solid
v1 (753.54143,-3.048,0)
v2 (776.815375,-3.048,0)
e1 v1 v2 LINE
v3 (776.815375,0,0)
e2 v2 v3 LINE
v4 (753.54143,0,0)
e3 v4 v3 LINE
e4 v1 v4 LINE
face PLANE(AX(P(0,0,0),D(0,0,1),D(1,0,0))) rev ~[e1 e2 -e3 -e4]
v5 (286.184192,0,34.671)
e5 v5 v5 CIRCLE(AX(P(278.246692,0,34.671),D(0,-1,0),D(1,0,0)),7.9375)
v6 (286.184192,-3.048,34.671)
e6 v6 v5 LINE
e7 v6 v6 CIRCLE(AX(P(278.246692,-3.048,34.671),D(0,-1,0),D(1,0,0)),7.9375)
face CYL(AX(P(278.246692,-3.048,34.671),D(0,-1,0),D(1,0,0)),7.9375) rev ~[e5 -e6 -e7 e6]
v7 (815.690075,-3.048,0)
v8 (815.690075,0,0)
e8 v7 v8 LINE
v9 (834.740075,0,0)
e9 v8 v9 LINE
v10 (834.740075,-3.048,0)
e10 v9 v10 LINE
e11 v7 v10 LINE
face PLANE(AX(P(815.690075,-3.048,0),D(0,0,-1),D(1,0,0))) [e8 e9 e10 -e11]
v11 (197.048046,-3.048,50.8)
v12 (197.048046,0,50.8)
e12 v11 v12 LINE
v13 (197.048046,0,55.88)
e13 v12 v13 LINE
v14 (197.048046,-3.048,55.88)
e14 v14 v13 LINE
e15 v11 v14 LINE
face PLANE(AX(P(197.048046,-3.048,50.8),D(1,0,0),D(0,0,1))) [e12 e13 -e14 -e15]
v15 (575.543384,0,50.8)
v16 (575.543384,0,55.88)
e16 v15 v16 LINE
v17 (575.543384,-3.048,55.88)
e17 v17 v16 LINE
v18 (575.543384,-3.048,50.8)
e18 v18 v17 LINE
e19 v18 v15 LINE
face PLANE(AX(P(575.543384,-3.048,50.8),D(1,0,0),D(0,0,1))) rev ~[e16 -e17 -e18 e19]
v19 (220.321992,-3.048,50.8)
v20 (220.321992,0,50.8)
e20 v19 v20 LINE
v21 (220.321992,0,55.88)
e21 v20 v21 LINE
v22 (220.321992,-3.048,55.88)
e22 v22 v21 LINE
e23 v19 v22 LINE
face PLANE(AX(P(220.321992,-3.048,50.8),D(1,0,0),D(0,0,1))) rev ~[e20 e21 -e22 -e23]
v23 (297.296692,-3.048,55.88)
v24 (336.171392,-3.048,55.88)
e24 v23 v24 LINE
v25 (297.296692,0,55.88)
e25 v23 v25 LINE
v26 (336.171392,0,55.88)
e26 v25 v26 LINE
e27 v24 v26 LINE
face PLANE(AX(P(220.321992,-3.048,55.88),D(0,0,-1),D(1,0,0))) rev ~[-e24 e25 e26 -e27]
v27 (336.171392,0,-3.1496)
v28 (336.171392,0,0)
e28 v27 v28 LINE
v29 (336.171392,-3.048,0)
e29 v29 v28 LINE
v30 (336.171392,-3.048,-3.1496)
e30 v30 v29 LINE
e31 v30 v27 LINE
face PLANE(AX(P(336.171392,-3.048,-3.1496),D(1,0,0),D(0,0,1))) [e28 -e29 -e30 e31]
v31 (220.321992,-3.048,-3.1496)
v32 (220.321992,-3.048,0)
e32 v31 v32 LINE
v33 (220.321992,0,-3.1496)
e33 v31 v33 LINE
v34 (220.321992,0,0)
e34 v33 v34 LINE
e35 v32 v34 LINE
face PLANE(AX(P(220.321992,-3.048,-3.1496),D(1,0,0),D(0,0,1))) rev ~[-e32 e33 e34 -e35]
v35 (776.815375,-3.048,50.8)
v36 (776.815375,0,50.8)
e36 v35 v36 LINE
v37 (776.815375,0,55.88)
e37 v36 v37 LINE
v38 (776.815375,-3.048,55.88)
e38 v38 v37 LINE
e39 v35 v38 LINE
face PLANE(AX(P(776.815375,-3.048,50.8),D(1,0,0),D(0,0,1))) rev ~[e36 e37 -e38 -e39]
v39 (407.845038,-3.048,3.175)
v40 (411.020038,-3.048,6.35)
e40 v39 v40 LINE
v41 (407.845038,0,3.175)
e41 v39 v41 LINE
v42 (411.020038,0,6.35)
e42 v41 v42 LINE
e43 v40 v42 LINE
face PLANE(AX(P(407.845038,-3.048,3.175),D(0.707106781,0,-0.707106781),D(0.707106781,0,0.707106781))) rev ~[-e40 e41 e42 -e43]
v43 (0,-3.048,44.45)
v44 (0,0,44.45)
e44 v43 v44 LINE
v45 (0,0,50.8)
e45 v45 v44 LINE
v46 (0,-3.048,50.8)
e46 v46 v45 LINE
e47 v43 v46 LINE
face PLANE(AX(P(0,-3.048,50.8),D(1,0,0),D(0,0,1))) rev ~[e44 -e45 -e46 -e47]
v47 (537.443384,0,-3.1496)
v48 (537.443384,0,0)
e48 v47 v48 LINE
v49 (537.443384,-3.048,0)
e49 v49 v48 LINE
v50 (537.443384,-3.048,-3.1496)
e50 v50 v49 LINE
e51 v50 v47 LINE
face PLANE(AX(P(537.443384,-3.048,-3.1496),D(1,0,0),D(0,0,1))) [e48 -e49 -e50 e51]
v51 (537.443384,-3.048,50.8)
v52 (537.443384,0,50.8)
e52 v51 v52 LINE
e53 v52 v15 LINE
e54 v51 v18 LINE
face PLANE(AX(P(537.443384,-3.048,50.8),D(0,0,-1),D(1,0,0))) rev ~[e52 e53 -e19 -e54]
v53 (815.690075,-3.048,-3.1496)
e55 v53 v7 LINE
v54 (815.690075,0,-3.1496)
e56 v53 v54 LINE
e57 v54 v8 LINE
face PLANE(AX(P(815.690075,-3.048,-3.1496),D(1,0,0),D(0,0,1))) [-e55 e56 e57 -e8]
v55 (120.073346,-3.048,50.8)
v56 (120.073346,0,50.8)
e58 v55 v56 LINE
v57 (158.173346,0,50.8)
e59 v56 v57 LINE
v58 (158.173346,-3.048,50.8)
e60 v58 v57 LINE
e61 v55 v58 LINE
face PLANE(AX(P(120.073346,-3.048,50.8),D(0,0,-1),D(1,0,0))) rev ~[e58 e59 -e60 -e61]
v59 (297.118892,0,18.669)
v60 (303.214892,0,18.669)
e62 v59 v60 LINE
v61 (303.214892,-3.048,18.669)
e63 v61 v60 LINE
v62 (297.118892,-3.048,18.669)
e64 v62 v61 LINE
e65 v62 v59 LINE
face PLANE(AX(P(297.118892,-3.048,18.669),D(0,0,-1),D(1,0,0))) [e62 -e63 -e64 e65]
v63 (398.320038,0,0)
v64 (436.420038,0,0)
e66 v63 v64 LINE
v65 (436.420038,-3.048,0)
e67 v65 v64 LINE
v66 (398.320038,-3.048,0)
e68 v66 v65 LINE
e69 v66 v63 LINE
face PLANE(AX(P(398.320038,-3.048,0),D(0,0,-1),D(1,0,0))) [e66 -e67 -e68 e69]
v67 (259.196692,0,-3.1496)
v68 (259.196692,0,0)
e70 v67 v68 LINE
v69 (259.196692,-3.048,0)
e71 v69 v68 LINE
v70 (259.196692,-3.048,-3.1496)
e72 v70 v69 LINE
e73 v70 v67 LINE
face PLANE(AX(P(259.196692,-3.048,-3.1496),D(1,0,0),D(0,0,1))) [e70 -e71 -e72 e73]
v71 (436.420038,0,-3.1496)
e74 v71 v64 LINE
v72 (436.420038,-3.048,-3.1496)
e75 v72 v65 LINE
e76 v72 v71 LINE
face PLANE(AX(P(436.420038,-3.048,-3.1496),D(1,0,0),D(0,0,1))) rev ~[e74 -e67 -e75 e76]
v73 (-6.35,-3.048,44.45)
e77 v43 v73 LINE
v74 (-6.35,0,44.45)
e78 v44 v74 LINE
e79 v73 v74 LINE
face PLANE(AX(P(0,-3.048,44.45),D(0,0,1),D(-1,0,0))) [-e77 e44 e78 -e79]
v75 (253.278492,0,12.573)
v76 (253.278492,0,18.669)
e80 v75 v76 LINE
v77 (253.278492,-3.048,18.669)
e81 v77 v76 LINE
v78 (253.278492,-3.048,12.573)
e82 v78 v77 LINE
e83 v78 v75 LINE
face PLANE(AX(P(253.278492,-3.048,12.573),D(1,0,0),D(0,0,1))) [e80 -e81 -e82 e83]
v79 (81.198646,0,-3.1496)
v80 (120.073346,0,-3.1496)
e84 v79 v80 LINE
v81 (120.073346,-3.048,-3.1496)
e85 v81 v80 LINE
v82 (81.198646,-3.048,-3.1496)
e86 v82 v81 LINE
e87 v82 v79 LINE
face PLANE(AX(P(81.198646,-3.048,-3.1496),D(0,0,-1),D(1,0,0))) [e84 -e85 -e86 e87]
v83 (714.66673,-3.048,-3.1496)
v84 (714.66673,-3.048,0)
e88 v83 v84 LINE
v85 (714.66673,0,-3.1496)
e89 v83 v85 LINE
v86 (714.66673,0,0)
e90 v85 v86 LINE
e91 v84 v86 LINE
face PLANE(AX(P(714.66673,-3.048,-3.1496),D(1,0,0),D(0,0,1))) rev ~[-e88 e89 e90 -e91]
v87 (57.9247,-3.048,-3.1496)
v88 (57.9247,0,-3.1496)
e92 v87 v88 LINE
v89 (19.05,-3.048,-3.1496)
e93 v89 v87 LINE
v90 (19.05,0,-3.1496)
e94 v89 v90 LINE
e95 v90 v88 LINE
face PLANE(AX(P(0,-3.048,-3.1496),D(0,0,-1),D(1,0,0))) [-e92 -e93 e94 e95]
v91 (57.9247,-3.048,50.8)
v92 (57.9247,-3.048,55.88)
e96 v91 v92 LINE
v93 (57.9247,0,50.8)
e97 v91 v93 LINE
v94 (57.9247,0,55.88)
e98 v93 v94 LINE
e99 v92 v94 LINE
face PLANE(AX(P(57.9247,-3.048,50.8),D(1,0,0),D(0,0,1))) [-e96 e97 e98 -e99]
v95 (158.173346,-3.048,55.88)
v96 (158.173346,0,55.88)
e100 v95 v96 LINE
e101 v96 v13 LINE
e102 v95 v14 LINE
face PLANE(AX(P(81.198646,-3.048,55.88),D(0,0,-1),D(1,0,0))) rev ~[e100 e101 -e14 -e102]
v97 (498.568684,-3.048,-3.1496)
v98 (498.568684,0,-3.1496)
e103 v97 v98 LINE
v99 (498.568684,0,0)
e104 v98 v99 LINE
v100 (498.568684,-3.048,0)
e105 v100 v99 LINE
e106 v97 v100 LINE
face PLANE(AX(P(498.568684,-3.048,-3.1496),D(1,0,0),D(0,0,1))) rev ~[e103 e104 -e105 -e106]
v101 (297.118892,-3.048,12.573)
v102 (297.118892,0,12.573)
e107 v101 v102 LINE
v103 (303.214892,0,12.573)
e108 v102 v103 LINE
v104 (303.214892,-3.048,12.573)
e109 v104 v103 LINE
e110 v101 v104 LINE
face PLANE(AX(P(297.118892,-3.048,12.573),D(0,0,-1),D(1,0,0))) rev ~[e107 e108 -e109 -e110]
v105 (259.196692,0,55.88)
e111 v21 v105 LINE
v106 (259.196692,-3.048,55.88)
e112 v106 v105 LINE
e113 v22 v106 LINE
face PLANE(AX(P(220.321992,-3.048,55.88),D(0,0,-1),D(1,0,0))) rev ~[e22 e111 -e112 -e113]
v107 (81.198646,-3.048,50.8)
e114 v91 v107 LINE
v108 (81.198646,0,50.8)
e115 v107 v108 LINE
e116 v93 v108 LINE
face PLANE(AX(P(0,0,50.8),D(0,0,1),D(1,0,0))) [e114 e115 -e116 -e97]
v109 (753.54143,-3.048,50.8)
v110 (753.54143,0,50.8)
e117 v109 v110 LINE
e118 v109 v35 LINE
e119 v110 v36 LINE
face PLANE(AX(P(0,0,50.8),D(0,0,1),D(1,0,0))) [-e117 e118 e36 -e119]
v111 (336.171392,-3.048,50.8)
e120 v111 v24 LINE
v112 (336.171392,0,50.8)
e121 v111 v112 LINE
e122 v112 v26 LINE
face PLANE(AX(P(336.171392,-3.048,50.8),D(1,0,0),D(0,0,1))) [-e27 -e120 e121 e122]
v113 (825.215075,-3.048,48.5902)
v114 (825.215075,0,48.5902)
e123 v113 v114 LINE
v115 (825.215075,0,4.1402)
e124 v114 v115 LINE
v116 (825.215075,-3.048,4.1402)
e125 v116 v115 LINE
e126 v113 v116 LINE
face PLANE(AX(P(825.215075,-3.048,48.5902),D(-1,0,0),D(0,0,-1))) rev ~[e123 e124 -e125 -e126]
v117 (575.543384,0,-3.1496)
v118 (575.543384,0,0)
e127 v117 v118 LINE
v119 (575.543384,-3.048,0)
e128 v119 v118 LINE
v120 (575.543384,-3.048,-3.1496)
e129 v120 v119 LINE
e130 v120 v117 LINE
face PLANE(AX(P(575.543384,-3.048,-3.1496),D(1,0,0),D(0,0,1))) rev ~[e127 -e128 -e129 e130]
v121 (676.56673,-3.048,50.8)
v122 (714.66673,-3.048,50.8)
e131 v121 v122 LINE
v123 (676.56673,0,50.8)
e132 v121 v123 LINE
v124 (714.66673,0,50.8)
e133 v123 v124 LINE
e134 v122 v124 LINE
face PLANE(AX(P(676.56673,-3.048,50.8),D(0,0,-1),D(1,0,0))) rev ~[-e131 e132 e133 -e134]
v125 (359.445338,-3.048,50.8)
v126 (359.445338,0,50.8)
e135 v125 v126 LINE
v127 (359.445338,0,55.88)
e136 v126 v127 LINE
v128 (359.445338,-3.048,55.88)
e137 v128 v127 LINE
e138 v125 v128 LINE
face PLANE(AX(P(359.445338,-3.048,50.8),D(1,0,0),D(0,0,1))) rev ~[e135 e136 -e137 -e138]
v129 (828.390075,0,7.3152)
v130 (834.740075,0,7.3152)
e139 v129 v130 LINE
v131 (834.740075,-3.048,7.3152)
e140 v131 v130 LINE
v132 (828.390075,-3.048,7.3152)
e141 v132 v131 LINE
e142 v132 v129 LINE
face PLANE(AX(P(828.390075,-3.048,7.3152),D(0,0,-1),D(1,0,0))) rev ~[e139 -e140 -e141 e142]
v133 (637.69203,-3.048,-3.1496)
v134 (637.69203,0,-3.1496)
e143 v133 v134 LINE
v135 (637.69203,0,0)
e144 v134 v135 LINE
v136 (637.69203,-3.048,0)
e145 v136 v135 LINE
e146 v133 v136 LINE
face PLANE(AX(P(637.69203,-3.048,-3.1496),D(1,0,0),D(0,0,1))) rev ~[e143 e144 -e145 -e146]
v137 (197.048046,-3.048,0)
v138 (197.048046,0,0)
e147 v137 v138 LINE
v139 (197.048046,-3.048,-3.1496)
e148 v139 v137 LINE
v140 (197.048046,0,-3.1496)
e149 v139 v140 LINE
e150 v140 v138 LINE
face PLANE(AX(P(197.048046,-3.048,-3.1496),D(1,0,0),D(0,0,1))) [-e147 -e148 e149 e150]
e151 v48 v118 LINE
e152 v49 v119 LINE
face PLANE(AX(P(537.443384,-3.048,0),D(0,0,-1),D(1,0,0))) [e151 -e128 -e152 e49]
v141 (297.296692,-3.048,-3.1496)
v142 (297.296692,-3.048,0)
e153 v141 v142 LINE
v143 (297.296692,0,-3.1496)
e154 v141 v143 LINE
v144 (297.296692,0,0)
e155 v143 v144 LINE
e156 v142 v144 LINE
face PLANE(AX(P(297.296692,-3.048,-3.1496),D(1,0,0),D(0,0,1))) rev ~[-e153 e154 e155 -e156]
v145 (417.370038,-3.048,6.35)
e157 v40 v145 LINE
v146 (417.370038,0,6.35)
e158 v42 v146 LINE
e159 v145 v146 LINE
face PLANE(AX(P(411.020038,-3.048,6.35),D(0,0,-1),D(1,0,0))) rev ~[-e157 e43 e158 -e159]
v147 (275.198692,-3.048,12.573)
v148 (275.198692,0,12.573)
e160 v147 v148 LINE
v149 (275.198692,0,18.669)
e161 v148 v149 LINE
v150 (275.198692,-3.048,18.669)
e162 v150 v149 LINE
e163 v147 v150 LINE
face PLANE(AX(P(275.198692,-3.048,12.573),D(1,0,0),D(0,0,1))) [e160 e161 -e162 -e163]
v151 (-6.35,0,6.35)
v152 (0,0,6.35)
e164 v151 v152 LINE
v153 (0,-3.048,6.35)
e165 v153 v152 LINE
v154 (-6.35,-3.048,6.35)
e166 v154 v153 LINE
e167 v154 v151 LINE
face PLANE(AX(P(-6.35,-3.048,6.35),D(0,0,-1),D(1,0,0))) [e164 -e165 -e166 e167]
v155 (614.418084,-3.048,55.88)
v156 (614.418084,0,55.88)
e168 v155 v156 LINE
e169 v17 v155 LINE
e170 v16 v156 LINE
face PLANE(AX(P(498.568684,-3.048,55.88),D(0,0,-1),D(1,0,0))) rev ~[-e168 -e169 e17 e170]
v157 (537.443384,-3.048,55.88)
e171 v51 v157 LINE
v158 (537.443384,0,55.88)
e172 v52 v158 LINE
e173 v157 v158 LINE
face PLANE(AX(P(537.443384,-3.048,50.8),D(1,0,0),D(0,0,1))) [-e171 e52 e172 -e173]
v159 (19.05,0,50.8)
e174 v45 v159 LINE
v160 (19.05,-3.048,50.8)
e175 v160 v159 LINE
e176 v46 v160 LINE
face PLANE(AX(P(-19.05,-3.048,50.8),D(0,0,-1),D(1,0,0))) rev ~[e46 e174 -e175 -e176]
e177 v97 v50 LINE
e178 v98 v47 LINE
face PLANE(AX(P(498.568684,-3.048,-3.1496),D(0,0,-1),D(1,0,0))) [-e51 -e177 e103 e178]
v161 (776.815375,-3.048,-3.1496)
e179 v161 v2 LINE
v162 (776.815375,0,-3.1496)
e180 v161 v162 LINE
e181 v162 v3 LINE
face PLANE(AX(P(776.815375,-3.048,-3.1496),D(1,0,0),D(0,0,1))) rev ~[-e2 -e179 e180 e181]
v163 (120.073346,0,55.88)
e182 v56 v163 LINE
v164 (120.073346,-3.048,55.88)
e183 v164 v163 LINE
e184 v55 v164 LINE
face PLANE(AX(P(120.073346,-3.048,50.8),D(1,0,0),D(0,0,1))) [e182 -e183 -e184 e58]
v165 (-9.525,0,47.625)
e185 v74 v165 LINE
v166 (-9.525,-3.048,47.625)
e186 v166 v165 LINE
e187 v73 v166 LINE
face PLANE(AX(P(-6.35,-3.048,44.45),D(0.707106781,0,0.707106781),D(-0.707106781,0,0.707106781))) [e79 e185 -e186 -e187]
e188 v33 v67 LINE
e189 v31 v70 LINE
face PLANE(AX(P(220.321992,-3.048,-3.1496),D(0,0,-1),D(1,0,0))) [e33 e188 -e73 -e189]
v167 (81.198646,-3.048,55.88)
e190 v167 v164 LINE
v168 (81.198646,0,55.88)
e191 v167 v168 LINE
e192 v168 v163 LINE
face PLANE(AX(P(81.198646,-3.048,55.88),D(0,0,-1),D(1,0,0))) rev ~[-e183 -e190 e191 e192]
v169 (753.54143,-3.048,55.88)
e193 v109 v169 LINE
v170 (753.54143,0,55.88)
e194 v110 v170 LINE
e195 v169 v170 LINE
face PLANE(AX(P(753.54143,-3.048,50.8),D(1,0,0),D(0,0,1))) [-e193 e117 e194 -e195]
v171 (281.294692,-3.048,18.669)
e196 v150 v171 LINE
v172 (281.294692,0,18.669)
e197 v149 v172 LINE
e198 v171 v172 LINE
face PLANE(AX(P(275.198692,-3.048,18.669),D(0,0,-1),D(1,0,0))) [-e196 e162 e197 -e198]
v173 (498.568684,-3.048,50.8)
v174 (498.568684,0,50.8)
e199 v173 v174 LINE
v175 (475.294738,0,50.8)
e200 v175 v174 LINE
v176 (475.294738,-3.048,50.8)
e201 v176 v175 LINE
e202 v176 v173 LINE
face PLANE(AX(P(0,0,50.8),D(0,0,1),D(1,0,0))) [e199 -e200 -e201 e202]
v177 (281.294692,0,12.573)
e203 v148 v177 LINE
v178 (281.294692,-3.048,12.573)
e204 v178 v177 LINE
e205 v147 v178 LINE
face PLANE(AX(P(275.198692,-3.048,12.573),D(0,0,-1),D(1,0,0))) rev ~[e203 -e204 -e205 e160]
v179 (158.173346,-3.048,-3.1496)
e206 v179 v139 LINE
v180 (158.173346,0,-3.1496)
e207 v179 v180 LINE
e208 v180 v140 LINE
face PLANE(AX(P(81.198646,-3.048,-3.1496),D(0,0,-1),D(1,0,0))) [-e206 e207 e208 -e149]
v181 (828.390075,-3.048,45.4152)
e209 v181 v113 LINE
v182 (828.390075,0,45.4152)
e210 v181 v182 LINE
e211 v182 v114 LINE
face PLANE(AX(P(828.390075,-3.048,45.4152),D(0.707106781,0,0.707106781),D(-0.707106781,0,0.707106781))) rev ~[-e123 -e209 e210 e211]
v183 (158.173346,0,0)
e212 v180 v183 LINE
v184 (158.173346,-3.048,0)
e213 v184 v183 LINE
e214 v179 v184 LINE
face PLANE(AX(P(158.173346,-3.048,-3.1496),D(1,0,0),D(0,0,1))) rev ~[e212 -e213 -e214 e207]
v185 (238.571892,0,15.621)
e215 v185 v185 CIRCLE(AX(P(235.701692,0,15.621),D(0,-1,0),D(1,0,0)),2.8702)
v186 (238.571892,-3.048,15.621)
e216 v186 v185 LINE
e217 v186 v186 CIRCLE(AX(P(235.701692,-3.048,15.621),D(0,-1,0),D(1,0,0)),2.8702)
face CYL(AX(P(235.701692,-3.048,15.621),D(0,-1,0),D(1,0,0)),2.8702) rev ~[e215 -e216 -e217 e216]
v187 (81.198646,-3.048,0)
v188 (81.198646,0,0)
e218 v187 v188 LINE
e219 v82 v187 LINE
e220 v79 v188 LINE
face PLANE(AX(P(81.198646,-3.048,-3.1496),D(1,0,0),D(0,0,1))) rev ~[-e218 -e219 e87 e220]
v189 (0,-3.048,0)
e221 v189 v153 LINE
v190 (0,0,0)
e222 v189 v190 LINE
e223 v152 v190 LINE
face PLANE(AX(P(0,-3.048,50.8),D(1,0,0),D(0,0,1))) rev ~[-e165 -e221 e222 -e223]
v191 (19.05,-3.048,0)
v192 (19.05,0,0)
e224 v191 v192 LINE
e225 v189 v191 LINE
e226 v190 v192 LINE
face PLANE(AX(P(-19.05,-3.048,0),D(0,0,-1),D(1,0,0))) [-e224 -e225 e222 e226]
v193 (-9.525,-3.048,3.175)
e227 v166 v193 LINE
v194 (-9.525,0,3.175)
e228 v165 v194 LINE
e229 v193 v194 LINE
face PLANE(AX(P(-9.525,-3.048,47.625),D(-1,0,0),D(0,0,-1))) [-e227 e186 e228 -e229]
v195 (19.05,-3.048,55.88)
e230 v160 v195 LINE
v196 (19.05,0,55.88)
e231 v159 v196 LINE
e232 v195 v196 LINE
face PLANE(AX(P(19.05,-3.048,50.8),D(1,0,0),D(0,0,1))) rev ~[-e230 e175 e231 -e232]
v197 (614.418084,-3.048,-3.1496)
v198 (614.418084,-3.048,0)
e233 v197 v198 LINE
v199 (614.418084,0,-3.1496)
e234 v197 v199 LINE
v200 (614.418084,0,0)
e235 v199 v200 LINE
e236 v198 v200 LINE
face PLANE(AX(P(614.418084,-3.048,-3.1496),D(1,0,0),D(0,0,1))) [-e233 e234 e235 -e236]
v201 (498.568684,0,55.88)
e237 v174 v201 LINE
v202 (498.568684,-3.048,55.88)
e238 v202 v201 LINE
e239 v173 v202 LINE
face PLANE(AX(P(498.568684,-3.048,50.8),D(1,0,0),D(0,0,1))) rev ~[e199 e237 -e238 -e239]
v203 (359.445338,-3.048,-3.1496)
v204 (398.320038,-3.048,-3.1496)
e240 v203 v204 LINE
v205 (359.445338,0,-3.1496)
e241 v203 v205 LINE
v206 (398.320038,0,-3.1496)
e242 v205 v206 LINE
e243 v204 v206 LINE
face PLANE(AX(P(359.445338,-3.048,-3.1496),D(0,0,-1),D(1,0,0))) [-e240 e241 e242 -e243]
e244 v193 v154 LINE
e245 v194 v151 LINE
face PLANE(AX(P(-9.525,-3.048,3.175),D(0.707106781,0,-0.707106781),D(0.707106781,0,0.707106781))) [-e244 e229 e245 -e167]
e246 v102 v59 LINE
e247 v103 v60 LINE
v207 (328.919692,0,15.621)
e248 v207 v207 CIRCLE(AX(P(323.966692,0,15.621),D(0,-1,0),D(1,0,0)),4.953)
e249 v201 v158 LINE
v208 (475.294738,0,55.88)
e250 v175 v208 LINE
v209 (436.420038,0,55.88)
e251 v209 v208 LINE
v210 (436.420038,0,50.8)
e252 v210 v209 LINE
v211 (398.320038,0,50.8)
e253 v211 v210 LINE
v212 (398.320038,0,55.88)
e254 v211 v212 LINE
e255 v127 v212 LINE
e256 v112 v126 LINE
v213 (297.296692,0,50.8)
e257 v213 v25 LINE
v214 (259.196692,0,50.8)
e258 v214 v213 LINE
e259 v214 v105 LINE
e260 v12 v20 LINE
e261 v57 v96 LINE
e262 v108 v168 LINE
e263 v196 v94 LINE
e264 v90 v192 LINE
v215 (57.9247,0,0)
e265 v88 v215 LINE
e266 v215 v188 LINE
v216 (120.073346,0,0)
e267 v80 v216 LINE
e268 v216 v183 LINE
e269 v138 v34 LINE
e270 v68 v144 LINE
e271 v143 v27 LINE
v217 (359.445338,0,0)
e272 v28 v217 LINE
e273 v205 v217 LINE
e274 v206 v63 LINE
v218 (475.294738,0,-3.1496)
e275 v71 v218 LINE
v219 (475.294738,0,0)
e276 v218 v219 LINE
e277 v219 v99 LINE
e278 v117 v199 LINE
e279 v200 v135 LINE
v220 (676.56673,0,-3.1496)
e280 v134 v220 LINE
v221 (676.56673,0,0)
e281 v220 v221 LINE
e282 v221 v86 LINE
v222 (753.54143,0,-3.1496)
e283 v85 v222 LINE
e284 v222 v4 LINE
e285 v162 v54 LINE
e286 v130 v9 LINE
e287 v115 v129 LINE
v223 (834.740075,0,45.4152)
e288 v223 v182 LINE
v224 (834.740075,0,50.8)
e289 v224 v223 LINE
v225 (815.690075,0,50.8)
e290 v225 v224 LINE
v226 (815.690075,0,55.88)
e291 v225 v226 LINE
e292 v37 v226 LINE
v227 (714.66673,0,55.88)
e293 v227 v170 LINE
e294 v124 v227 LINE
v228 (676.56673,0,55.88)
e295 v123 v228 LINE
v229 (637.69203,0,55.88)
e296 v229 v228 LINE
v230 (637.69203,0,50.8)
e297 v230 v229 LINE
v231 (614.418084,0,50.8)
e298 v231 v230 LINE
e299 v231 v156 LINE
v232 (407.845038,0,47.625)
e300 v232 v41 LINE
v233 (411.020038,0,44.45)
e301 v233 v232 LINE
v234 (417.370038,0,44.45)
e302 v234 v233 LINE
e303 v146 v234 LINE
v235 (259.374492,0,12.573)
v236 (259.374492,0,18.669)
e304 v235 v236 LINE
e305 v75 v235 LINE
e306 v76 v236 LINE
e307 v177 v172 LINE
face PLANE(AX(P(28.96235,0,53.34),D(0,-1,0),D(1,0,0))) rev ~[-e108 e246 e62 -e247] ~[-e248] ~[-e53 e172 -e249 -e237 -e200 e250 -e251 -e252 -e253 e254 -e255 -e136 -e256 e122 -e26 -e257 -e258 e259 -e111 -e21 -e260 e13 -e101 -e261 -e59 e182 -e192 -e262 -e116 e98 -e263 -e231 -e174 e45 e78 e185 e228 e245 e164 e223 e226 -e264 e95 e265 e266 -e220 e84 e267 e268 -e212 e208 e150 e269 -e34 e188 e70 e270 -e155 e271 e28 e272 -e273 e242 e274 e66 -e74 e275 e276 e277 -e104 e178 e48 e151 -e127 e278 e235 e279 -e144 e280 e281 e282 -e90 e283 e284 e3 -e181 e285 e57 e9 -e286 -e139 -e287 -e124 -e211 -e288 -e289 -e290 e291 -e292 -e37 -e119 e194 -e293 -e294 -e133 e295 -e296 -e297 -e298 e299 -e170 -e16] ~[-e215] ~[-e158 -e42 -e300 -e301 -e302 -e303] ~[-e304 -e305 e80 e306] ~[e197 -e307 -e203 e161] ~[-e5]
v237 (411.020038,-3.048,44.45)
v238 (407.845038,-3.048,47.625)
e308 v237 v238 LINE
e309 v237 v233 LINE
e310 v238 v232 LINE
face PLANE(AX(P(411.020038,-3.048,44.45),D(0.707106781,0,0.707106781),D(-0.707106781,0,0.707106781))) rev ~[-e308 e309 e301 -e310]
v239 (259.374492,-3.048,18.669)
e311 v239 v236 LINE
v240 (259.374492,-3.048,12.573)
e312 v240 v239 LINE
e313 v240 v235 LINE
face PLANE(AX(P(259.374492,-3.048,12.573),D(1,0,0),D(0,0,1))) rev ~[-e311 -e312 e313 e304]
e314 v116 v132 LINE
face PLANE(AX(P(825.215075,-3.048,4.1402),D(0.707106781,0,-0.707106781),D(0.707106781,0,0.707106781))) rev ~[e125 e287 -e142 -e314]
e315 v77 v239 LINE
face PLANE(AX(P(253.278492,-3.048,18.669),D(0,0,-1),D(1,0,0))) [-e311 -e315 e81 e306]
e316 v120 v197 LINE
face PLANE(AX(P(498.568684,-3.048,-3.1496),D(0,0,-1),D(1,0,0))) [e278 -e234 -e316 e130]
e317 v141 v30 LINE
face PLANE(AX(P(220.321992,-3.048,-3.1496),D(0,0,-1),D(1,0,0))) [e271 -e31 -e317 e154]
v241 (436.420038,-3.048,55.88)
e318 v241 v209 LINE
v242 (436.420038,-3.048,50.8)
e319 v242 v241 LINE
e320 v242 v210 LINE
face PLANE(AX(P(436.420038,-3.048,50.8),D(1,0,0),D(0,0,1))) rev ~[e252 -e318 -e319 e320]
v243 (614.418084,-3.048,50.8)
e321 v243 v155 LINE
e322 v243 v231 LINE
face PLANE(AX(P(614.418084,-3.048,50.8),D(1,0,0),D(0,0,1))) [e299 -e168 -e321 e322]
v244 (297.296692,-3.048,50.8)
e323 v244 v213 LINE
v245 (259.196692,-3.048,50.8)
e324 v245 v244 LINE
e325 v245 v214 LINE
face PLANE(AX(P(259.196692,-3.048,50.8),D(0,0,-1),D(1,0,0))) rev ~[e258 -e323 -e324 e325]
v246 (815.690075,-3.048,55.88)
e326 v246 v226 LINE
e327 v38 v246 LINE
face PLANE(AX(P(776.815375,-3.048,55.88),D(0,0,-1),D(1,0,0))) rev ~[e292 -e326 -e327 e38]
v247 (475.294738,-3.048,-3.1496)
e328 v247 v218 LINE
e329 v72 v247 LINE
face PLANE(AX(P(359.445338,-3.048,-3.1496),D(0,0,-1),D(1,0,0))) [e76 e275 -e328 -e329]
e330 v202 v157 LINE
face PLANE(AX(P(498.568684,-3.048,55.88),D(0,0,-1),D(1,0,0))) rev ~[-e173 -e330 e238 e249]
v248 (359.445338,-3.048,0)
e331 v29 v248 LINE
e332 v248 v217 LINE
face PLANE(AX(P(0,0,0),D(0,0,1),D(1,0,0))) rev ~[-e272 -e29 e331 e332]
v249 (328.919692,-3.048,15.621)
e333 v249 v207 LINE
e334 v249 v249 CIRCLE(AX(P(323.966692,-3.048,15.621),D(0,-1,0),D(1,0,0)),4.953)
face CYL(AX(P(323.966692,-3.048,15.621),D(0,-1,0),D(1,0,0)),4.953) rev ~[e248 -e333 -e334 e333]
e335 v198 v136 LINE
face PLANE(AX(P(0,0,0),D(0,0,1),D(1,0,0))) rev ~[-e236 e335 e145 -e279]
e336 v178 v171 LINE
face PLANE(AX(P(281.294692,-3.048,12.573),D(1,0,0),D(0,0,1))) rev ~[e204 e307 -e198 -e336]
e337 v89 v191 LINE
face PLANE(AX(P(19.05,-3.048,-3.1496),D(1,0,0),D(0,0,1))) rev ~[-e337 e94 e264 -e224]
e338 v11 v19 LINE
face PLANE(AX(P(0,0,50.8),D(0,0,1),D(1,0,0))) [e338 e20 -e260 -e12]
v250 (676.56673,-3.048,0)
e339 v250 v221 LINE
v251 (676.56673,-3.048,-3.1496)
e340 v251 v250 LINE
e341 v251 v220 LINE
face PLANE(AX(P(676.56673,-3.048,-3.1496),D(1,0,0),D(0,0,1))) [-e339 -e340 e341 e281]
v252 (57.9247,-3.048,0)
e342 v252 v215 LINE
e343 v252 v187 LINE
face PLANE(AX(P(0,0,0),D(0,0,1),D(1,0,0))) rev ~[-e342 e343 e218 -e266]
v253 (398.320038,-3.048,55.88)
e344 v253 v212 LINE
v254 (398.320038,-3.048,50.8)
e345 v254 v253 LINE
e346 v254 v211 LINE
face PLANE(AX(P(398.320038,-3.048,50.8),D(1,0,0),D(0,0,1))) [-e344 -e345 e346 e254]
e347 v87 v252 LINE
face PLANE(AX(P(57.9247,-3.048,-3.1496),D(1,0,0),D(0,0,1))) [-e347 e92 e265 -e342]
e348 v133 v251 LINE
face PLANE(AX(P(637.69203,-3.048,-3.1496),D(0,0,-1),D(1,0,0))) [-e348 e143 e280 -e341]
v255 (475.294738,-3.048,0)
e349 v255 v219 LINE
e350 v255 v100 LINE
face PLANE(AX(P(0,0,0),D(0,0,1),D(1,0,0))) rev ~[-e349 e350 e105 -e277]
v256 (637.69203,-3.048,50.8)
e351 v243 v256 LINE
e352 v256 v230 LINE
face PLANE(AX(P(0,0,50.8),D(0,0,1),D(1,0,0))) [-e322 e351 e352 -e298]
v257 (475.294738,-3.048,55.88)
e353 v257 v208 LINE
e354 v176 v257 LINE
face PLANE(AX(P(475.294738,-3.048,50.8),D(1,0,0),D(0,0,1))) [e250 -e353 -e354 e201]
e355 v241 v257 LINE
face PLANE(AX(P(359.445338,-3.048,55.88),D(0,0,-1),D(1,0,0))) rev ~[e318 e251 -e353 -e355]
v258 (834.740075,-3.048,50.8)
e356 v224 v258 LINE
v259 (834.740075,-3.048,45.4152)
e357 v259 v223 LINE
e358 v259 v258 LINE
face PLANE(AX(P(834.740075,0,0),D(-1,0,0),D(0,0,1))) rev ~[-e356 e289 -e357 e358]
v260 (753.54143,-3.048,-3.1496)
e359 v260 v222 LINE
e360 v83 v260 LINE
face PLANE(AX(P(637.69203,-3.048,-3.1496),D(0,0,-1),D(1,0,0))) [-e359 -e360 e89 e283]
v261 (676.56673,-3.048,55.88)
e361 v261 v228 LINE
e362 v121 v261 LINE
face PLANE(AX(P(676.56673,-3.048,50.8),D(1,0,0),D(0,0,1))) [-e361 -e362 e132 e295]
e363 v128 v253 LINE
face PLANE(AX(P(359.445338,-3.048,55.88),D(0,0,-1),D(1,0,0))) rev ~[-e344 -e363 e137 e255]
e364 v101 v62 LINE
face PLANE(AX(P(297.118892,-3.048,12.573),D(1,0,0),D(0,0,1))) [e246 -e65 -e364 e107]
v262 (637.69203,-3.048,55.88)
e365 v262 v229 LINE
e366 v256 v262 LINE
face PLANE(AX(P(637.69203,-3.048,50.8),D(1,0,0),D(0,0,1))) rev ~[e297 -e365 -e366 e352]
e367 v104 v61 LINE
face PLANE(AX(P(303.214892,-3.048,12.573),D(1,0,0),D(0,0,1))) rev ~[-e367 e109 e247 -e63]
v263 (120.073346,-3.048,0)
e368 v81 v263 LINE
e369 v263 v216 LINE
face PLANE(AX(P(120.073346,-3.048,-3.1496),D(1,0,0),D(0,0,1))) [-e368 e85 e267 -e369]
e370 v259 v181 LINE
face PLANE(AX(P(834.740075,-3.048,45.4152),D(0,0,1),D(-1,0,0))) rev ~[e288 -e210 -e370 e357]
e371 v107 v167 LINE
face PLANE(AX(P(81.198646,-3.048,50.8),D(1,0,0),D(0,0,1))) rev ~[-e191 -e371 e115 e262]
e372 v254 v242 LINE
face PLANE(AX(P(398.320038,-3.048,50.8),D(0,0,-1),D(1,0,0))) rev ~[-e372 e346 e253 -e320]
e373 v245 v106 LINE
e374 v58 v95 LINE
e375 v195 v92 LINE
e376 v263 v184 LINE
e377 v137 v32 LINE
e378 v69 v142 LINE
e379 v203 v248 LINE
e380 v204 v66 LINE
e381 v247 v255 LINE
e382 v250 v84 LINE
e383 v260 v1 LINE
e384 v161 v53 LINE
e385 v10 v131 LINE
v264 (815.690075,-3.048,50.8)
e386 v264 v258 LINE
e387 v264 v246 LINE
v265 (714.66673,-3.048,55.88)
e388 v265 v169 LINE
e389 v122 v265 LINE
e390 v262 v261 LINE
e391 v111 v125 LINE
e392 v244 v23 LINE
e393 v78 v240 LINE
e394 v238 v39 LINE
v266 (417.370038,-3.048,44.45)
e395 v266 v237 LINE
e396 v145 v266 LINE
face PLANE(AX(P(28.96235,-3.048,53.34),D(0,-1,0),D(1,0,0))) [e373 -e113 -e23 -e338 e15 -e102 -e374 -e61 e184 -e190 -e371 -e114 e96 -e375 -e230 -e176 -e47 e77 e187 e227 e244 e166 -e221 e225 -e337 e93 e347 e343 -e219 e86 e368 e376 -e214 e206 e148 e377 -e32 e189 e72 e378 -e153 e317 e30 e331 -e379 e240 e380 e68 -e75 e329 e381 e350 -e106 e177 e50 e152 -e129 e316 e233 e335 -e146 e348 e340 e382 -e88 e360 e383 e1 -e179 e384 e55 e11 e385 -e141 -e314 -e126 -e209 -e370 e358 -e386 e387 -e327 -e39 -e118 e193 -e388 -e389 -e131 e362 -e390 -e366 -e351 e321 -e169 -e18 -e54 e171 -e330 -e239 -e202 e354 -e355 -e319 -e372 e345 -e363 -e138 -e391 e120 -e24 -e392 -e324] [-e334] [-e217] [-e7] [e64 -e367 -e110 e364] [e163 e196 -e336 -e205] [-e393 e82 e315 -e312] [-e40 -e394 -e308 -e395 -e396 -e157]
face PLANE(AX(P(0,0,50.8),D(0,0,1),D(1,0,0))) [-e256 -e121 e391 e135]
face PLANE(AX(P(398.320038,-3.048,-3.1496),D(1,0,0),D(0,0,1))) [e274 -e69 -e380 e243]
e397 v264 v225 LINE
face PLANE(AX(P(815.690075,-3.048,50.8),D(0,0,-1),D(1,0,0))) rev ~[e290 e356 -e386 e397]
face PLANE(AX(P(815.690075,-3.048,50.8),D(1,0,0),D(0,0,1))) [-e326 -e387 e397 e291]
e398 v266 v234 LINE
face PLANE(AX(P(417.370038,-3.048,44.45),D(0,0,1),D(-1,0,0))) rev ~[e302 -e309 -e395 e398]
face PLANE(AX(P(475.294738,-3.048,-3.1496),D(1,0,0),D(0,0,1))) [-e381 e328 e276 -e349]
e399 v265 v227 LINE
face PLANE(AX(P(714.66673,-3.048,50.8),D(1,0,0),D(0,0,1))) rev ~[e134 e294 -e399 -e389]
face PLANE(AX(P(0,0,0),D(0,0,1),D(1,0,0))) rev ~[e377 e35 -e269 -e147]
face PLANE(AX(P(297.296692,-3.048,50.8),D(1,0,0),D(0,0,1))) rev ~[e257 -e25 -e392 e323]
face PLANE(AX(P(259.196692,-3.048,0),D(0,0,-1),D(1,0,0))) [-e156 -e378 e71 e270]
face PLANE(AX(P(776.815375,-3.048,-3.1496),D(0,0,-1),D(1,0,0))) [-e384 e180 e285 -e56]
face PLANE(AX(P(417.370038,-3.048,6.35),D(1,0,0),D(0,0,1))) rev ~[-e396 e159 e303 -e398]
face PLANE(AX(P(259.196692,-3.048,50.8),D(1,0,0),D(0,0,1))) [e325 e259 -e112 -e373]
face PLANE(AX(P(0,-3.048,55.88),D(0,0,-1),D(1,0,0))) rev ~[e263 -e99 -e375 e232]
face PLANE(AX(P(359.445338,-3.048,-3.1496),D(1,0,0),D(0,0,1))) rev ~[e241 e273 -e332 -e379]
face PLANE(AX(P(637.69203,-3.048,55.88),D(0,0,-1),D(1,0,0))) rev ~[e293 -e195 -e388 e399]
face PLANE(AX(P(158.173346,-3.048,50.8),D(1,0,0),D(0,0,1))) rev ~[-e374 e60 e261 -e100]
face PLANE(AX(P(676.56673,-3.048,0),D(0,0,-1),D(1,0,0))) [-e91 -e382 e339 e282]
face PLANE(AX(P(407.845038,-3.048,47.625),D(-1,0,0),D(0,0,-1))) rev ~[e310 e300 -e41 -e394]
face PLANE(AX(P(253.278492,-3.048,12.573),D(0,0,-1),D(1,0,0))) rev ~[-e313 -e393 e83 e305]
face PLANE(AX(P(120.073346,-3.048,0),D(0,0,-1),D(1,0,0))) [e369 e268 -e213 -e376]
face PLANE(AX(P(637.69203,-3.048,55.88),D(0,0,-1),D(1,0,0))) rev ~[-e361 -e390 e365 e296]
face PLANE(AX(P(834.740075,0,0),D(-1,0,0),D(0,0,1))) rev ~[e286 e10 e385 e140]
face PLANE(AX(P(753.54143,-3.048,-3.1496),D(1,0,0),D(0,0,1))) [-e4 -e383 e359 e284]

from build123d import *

# Parameters (mm, degrees)
F0_W      = 834.7400754492
F0_H      = 50.8
F1_DEPTH  = 3.048
F3_W      = 57.9247
F3_H      = 5.08
F3_W_2    = 115.8494
F3_H_2    = 3.1496
F4_DEPTH  = 3.048
F6_DEPTH  = 3.048
F7_DEPTH  = 3.049
F9_W      = 6.096
F9_H      = 6.096
F9_R      = 2.8702
F9_R_2    = 4.953
F9_R_3    = 7.9375
F10_DEPTH = 3.049
F11_DEPTH = 25.4
F12_W     = 38.1
F12_H     = 5.08
F12_H_2   = 3.1496
F13_DEPTH = 3.048


# Not quite as in the source:
# - a feature names something its author has since deleted; it is built from what else it names


with BuildPart() as f1:
    # F0 (on Front) → F1 (new body)
    with BuildSketch(Plane.XZ):
        with Locations((417.3700377246, 25.4)):
            Rectangle(F0_W, F0_H)
    extrude(amount=F1_DEPTH)

    # F3 (on face) → F4 (join)
    with BuildSketch(Plane.XZ.offset(3.048)):
        with Locations((28.96235, 53.34)):
            Rectangle(F3_W, F3_H)
        with Locations((139.1233459082, 53.34)):
            Rectangle(F3_W_2, F3_H)
        with Locations((278.2466918164, 53.34)):
            Rectangle(F3_W_2, F3_H)
        with Locations((417.3700377246, 53.34)):
            Rectangle(F3_W_2, F3_H)
        with Locations((556.4933836328, 53.34)):
            Rectangle(F3_W_2, F3_H)
        with Locations((695.616729541, 53.34)):
            Rectangle(F3_W_2, F3_H)
        with Locations((805.7777254492, 53.34)):
            Rectangle(F3_W, F3_H)
        with Locations((28.96235, -1.5748)):
            Rectangle(F3_W, F3_H_2)
        with Locations((139.1233459082, -1.5748)):
            Rectangle(F3_W_2, F3_H_2)
        with Locations((278.2466918164, -1.5748)):
            Rectangle(F3_W_2, F3_H_2)
        with Locations((417.3700377246, -1.5748)):
            Rectangle(F3_W_2, F3_H_2)
        with Locations((556.4933836328, -1.5748)):
            Rectangle(F3_W_2, F3_H_2)
        with Locations((695.616729541, -1.5748)):
            Rectangle(F3_W_2, F3_H_2)
        with Locations((805.7777254492, -1.5748)):
            Rectangle(F3_W, F3_H_2)
    extrude(amount=-F4_DEPTH)

    # F5 (on face) → F6 (join)
    with BuildSketch(Plane.XZ.offset(3.048)):
        Polygon((-6.35, 6.35), (0, 6.35), (0, 44.45), (-6.35, 44.45), (-9.525, 47.625), (-9.525, 3.175), align=None)
    extrude(amount=-F6_DEPTH)

    # F5 (on face) → F7 (cut, through all)
    with BuildSketch(Plane.XZ.offset(3.048)):
        Polygon((828.3900754492, 7.3152), (834.7400754492, 7.3152), (834.7400754492, 45.4152), (828.3900754492, 45.4152), (825.2150754492, 48.5902), (825.2150754492, 4.1402), align=None)
    extrude(amount=-F7_DEPTH, mode=Mode.SUBTRACT)

    # F9 (on face) → F10 (cut, through all)
    with BuildSketch(Plane.XZ.offset(3.048)):
        with Locations((256.3264918164, 15.621)):
            Rectangle(F9_W, F9_H)
        with Locations((278.2466918164, 15.621)):
            Rectangle(F9_W, F9_H)
        with Locations((300.1668918164, 15.621)):
            Rectangle(F9_W, F9_H)
        with Locations((235.7016918164, 15.621)):
            Circle(F9_R)
        with Locations((323.9666918164, 15.621)):
            Circle(F9_R_2)
        with Locations((278.2466918164, 34.671)):
            Circle(F9_R_3)
    extrude(amount=-F10_DEPTH, mode=Mode.SUBTRACT)

    # F8 (on face) → F11 (cut)
    with BuildSketch(Plane.XZ.offset(3.048)):
        Polygon((411.0200377246, 6.35), (417.3700377246, 6.35), (417.3700377246, 44.45), (411.0200377246, 44.45), (407.8450377246, 47.625), (407.8450377246, 3.175), align=None)
    extrude(amount=-F11_DEPTH, mode=Mode.SUBTRACT)

    # F12 (on face) → F13 (cut, through all)
    with BuildSketch(Plane.XZ.offset(3.048)):
        with Locations((139.1233459082, 53.34)):
            Rectangle(F12_W, F12_H)
        with Locations((278.2466918164, 53.34)):
            Rectangle(F12_W, F12_H)
        with Locations((417.3700377246, 53.34)):
            Rectangle(F12_W, F12_H)
        with Locations((556.4933836328, 53.34)):
            Rectangle(F12_W, F12_H)
        with Locations((695.616729541, 53.34)):
            Rectangle(F12_W, F12_H)
        with Locations((834.7400754492, 53.34)):
            Rectangle(F12_W, F12_H)
        with Locations((0, 53.34)):
            Rectangle(F12_W, F12_H)
        with Locations((0, -1.5748)):
            Rectangle(F12_W, F12_H_2)
        with Locations((139.1233459082, -1.5748)):
            Rectangle(F12_W, F12_H_2)
        with Locations((278.2466918164, -1.5748)):
            Rectangle(F12_W, F12_H_2)
        with Locations((417.3700377246, -1.5748)):
            Rectangle(F12_W, F12_H_2)
        with Locations((556.4933836328, -1.5748)):
            Rectangle(F12_W, F12_H_2)
        with Locations((695.616729541, -1.5748)):
            Rectangle(F12_W, F12_H_2)
        with Locations((834.7400754492, -1.5748)):
            Rectangle(F12_W, F12_H_2)
    extrude(amount=-F13_DEPTH, mode=Mode.SUBTRACT)


solid = f1.part
